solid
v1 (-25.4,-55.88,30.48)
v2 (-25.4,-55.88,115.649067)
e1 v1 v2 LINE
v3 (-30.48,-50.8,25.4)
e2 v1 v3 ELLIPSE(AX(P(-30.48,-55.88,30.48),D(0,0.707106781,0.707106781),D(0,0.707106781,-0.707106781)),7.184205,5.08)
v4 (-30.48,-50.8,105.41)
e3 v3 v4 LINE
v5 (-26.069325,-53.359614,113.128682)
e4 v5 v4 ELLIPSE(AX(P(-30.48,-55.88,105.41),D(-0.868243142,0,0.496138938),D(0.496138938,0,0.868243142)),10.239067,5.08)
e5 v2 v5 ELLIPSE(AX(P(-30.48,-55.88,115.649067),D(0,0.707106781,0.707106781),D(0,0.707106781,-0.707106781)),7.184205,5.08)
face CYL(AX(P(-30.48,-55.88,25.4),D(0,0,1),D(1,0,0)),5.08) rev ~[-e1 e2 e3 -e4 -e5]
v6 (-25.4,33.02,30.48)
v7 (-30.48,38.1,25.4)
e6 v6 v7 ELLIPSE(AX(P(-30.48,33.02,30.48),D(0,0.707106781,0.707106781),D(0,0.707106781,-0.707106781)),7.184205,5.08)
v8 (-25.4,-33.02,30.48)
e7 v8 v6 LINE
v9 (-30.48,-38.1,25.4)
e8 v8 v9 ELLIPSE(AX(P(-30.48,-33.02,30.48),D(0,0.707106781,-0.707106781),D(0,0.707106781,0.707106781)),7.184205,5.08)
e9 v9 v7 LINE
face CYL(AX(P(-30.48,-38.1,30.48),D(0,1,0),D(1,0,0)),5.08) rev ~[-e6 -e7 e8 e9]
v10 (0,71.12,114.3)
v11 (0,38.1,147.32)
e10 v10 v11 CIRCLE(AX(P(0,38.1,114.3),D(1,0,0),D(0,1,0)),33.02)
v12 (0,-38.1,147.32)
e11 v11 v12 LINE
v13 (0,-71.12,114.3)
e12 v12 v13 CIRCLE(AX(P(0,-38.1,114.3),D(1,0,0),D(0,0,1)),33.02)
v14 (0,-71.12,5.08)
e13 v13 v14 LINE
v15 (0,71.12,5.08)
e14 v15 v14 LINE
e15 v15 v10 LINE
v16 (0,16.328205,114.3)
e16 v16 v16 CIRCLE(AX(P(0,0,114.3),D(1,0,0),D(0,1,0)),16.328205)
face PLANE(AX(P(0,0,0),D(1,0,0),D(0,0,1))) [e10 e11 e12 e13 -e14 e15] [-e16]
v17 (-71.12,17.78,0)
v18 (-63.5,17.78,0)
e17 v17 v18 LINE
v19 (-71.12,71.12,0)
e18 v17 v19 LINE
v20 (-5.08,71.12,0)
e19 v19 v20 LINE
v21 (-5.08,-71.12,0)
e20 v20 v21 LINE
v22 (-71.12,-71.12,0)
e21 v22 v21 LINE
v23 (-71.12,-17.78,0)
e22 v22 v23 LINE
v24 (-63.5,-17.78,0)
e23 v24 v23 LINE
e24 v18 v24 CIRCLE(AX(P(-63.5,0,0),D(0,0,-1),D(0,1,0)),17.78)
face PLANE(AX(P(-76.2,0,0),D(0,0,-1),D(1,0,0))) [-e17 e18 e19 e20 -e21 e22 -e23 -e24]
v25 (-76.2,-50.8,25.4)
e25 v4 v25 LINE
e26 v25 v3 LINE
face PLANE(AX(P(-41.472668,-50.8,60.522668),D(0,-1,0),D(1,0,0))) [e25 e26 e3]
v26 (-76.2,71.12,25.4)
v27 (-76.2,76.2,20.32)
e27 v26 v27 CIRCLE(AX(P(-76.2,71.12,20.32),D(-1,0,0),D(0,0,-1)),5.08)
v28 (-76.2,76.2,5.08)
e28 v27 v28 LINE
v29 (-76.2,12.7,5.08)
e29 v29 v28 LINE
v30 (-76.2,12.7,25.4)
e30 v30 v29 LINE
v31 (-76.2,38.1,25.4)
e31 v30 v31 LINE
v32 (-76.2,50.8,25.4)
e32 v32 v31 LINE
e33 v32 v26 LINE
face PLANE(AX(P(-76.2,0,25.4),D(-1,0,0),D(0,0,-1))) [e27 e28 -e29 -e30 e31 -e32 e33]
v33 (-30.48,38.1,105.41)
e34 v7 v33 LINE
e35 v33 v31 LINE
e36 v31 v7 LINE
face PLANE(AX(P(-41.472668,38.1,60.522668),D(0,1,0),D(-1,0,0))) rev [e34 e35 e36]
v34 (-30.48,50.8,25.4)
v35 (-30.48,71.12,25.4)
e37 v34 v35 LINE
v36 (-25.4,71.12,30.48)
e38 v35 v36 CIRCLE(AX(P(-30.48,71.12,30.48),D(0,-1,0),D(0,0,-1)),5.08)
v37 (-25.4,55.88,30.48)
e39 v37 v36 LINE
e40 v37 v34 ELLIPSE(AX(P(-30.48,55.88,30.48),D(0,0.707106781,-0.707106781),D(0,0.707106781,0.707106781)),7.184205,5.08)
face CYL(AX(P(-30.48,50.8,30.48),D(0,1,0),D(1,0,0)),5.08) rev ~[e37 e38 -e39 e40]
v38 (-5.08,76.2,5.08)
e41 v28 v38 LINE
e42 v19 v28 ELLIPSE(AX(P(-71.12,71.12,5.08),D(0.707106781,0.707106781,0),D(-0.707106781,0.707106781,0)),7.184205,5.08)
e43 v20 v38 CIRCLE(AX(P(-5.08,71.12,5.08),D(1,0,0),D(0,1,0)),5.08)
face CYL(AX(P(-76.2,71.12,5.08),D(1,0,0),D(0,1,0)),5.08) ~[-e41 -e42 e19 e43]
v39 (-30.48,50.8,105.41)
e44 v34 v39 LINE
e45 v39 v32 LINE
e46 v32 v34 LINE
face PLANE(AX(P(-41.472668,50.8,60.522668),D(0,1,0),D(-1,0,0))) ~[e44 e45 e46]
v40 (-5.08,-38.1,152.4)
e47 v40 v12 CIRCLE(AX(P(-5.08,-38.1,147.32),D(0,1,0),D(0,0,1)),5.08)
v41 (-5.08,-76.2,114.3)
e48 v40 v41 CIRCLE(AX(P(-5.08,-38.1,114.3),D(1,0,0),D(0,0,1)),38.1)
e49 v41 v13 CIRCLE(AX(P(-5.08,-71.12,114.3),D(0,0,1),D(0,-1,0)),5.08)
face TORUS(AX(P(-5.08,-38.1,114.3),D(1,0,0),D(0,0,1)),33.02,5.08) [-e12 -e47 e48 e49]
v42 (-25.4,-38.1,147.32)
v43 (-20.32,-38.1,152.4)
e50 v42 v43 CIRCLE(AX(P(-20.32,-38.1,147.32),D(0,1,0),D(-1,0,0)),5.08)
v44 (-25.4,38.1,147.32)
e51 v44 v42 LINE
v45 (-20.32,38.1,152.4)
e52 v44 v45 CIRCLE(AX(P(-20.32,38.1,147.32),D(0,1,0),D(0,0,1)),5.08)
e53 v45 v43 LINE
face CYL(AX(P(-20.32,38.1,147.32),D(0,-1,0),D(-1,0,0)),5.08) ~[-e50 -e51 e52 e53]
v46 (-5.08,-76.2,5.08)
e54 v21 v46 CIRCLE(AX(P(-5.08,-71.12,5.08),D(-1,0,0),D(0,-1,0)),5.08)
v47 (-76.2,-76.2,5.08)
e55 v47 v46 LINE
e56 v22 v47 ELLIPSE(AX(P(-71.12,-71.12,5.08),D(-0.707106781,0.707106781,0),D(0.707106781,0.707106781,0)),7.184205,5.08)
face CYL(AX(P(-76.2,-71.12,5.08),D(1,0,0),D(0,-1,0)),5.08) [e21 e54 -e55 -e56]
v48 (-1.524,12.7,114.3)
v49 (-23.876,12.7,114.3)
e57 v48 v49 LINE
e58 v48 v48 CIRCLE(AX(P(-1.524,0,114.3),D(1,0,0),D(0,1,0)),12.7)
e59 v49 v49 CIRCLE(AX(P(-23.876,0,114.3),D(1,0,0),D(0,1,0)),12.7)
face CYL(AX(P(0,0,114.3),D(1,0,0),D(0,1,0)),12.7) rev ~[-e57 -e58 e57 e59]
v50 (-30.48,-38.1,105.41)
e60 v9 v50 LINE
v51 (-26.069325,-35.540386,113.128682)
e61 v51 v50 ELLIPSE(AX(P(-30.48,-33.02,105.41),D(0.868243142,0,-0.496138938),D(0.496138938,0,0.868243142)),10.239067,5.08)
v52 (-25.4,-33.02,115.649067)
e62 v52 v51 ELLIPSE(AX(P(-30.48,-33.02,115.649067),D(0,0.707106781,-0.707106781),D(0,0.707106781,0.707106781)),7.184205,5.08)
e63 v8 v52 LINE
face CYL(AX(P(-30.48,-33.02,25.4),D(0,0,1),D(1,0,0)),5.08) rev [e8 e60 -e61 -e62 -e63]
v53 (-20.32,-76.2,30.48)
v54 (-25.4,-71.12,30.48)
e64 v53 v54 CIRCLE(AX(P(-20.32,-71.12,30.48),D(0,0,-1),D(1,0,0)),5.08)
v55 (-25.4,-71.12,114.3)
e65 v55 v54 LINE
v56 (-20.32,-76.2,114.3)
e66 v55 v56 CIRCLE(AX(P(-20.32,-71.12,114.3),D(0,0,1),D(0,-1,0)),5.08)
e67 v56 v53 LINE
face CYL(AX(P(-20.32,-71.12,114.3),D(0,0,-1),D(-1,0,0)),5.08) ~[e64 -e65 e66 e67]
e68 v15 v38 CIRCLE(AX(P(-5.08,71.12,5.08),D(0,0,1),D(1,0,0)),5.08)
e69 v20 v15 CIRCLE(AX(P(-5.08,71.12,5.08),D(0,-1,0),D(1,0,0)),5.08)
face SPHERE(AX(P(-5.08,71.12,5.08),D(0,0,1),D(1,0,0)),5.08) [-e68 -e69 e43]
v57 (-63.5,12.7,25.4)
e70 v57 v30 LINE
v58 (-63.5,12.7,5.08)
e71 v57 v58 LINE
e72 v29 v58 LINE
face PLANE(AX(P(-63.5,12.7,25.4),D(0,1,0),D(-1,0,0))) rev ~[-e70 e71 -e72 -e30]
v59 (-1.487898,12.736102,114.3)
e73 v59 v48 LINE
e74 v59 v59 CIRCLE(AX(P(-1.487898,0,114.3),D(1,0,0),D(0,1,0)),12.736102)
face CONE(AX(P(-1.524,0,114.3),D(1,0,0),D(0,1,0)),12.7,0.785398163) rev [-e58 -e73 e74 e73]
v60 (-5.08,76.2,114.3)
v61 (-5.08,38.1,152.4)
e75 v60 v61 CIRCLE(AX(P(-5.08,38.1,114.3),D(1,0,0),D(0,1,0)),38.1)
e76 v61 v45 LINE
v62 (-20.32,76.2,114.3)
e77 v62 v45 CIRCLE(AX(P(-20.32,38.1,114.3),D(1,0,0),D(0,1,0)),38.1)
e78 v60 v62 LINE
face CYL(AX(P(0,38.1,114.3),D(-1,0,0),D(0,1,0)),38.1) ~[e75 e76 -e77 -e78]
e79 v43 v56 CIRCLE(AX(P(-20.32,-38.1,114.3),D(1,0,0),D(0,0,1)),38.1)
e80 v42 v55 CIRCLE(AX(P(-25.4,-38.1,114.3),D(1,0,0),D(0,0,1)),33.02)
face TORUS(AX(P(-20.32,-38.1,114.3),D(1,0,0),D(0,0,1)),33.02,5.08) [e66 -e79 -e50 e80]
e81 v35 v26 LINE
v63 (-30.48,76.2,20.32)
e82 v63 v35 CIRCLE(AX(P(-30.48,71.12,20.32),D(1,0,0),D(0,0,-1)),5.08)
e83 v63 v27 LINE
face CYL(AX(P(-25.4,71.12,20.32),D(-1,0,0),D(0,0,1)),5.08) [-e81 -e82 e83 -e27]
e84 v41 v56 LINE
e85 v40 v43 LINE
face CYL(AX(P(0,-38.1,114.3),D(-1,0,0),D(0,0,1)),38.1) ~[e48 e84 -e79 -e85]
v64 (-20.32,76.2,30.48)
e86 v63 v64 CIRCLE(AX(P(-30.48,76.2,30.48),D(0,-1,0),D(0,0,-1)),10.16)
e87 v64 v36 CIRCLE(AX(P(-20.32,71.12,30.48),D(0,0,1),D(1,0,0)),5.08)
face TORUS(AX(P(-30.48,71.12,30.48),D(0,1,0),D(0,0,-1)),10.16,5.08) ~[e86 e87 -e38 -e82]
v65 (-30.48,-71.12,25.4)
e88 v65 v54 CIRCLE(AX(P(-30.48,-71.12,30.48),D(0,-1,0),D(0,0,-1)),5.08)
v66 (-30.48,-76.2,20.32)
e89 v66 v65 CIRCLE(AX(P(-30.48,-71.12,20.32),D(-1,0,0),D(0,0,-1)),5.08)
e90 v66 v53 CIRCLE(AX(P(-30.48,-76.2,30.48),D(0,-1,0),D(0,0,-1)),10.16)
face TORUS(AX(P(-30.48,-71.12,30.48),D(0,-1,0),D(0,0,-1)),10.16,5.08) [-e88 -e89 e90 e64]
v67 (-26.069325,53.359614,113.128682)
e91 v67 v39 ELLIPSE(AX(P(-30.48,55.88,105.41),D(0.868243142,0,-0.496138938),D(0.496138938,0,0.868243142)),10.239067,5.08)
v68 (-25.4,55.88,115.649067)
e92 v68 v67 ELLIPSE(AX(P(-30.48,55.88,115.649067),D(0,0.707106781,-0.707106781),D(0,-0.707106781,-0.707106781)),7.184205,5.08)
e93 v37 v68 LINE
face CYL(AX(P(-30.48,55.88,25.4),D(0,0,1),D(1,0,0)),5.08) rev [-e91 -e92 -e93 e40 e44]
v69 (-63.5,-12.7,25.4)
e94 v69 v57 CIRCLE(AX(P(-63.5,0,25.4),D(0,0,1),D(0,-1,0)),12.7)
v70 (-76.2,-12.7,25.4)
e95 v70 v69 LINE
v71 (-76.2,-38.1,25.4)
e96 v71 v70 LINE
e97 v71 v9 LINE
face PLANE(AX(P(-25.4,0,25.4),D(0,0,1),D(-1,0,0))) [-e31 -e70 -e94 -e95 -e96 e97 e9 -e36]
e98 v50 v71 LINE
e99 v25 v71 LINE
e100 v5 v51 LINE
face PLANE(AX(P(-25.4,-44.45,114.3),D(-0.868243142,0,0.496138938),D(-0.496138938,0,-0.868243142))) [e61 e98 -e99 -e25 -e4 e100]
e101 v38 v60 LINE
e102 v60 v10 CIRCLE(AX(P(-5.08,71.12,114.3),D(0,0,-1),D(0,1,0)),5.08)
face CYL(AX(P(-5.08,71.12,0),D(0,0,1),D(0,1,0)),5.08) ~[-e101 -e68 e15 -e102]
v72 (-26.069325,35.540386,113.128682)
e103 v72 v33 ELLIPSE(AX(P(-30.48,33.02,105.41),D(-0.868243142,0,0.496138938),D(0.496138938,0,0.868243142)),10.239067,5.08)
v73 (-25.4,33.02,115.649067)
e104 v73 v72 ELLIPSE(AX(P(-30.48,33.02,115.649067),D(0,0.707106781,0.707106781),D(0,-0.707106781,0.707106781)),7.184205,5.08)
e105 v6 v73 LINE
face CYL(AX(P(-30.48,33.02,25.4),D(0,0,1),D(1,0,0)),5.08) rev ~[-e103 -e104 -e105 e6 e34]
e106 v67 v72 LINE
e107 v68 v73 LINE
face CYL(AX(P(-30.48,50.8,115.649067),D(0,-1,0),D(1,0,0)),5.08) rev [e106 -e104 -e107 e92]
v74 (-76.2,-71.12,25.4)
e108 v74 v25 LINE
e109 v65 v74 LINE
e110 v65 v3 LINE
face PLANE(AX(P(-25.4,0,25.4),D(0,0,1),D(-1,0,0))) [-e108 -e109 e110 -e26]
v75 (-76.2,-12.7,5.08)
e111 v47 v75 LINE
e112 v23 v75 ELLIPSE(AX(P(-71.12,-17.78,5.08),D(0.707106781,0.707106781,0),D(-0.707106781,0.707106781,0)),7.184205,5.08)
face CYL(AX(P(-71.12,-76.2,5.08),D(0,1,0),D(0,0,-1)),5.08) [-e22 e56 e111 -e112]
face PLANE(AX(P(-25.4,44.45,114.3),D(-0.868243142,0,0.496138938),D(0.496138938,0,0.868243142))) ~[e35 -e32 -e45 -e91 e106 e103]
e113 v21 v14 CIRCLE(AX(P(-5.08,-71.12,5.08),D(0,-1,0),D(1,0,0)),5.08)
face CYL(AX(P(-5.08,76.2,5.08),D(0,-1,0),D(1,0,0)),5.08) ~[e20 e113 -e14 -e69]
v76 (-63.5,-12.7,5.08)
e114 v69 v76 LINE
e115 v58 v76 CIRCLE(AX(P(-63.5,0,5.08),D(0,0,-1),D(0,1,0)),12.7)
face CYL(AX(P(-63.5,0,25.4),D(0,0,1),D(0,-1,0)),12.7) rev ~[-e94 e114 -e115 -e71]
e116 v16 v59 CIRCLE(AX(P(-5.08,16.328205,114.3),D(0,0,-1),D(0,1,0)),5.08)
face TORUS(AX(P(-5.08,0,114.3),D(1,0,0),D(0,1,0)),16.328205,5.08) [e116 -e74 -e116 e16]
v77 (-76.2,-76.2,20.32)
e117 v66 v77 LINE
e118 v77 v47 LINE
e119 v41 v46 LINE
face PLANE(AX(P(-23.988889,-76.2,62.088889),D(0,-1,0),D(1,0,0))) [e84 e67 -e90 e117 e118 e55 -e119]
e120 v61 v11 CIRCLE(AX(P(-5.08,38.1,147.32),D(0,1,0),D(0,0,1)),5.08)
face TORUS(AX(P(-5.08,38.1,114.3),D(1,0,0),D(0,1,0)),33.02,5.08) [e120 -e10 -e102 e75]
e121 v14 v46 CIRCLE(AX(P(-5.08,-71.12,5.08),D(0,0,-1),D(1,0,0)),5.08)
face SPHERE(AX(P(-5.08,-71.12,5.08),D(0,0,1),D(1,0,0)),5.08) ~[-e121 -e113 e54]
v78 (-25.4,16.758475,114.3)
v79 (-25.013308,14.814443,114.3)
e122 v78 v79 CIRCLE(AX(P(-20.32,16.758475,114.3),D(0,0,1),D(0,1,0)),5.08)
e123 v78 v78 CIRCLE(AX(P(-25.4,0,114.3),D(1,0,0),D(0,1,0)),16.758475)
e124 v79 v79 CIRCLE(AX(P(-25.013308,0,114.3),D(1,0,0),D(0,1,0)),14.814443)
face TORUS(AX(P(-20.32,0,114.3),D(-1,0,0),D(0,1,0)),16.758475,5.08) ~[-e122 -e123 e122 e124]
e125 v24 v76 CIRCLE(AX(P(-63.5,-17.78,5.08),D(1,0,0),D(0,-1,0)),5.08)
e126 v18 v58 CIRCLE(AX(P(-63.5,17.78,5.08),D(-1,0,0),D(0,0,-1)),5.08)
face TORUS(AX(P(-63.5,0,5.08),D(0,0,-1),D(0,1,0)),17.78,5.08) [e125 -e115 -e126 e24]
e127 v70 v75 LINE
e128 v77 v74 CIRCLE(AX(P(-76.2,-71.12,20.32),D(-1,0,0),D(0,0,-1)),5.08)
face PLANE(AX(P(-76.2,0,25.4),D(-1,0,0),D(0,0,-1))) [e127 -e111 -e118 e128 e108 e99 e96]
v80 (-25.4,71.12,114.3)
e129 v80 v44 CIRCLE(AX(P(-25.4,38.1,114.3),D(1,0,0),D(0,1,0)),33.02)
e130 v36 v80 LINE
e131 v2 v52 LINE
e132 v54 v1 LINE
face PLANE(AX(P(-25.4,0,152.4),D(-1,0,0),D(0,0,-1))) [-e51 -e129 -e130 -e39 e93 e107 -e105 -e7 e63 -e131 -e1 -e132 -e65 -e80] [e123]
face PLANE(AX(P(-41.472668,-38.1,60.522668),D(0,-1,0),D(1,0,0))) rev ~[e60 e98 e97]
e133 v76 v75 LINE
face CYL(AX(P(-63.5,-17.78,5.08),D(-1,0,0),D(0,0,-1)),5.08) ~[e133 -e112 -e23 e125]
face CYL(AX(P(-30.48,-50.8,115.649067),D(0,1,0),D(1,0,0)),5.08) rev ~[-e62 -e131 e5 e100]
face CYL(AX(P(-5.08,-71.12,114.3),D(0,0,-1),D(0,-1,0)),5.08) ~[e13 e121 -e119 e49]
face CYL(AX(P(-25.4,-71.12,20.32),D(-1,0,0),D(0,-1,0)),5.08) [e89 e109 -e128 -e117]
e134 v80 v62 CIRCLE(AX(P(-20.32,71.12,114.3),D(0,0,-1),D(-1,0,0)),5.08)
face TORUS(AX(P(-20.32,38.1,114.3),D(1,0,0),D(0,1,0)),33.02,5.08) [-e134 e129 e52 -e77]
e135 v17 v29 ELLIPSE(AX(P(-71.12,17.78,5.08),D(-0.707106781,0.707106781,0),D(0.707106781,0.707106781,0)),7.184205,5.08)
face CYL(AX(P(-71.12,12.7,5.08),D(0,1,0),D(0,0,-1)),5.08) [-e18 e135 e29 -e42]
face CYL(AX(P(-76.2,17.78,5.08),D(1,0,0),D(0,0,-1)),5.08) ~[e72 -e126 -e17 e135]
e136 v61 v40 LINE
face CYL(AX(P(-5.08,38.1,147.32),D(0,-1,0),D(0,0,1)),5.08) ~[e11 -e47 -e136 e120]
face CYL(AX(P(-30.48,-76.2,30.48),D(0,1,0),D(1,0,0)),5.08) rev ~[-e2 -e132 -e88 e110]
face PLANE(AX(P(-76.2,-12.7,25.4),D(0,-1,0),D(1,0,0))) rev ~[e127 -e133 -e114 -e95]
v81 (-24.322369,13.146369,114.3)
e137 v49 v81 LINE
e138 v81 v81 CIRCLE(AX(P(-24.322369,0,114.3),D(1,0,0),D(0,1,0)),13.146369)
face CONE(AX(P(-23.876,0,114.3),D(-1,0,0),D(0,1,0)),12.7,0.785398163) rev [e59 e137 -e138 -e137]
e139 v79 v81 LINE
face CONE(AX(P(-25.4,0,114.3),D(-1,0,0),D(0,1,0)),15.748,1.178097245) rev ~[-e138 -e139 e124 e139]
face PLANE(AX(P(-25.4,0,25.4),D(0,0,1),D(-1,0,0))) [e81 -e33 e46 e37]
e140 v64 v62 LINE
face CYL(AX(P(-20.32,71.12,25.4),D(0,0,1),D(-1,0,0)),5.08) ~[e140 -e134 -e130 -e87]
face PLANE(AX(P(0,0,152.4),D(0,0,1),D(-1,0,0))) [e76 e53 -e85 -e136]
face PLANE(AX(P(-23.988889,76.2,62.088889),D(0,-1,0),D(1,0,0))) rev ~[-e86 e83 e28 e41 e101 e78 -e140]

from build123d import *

# Parameters (mm, degrees)
F1_DEPTH  = 76.2
F2_R      = 12.7
F3_DEPTH  = 76.201
F5_DEPTH  = 25.401
F6_R      = 38.1
F7_R      = 38.1
F10_DEPTH = 6.35
F11_SIZE  = 1.524
F12_SIZE  = 1.524
F13_R     = 5.08


# Not quite as in the source:
# - a length typed as a fraction of an inch, garbled in the dataset ("3 / 203.2 mm" for 3/8 in), is restored
# - a pattern or mirror of a feature is missing from the dataset's text; its kind, count and spacing are read off the source's solid


with BuildPart() as f1:
    # F0 (on Front) → F1 (new body, symmetric)
    with BuildSketch(Plane.XZ):
        Polygon((-76.2, 0), (0, 0), (0, 152.4), (-25.4, 152.4), (-25.4, 25.4), (-76.2, 25.4), align=None)
    extrude(amount=F1_DEPTH, both=True)

    # F2 (on face) → F3 (cut, through all)
    with BuildSketch(Plane.YZ):
        with Locations((0, 114.3)):
            Circle(F2_R)
    extrude(amount=-F3_DEPTH, mode=Mode.SUBTRACT)

    # F4 (on face) → F5 (cut, through all)
    with BuildSketch(Plane.XY.offset(25.4)):
        with BuildLine():
            ThreePointArc((-63.5, -12.7), (-50.8, 0), (-63.5, 12.7))
            Line((-63.5, 12.7), (-76.2, 12.7))
            Line((-76.2, 12.7), (-76.2, -12.7))
            Line((-76.2, -12.7), (-63.5, -12.7))
        make_face()
    extrude(amount=-F5_DEPTH, mode=Mode.SUBTRACT)

    # F6
    f6_edges = [f1.edges().sort_by_distance(p)[0] for p in [
        (-12.7, 76.2, 152.4),
    ]]
    fillet(f6_edges, radius=F6_R)

    # F7
    f7_edges = [f1.edges().sort_by_distance(p)[0] for p in [
        (-12.7, -76.2, 152.4),
    ]]
    fillet(f7_edges, radius=F7_R)

    # F9 (on offset) → F10 (join, symmetric)
    with BuildSketch(Plane.XZ.offset(44.45)):
        Polygon((-76.2, 25.4), (-25.4, 25.4), (-25.4, 114.3), align=None)
    f10 = extrude(amount=F10_DEPTH, both=True)

    # F10_copies: F10 across plane
    add(f10.mirror(Plane.ZX))

    # F11
    f11_edges = [f1.edges().sort_by_distance(p)[0] for p in [
        (0, -12.7, 114.3),
        (-12.7, 12.7, 114.3),
        (-25.4, -12.7, 114.3),
    ]]
    chamfer(f11_edges, length=F11_SIZE)

    # F12
    f12_edges = [f1.edges().sort_by_distance(p)[0] for p in [
        (-25.4, -14.224, 114.3),
    ]]
    chamfer(f12_edges, length=F12_SIZE)

    # F13
    f13_edges = [f1.edges().sort_by_distance(p)[0] for p in [
        (-25.4, -15.748, 114.3),
        (-25.4, -65.040768, 141.240768),
        (-25.4, -76.2, 69.85),
        (-25.4, -63.5, 25.4),
        (-25.4, -50.8, 69.85),
        (-25.4, -44.45, 114.3),
        (-25.4, -38.1, 69.85),
        (-25.4, 0, 25.4),
        (-25.4, 38.1, 69.85),
        (-25.4, 44.45, 114.3),
        (-25.4, 50.8, 69.85),
        (-25.4, 63.5, 25.4),
        (-25.4, 76.2, 69.85),
        (-25.4, 65.040768, 141.240768),
        (-25.4, 0, 152.4),
        (-12.7, -38.1, 152.4),
        (-12.7, 38.1, 152.4),
        (0, 0, 152.4),
        (0, 65.040768, 141.240768),
        (-12.7, 76.2, 114.3),
        (0, -65.040768, 141.240768),
        (-12.7, -76.2, 114.3),
        (0, -14.224, 114.3),
        (0, -76.2, 57.15),
        (0, 76.2, 57.15),
        (0, 0, 0),
        (-76.2, 44.45, 0),
        (-69.85, 12.7, 0),
        (-50.8, 0, 0),
        (-69.85, -12.7, 0),
        (-76.2, -44.45, 0),
        (-38.1, -76.2, 0),
        (-38.1, 76.2, 0),
        (-50.8, -76.2, 25.4),
        (-50.8, 76.2, 25.4),
    ]]
    fillet(f13_edges, radius=F13_R)


solid = f1.part
